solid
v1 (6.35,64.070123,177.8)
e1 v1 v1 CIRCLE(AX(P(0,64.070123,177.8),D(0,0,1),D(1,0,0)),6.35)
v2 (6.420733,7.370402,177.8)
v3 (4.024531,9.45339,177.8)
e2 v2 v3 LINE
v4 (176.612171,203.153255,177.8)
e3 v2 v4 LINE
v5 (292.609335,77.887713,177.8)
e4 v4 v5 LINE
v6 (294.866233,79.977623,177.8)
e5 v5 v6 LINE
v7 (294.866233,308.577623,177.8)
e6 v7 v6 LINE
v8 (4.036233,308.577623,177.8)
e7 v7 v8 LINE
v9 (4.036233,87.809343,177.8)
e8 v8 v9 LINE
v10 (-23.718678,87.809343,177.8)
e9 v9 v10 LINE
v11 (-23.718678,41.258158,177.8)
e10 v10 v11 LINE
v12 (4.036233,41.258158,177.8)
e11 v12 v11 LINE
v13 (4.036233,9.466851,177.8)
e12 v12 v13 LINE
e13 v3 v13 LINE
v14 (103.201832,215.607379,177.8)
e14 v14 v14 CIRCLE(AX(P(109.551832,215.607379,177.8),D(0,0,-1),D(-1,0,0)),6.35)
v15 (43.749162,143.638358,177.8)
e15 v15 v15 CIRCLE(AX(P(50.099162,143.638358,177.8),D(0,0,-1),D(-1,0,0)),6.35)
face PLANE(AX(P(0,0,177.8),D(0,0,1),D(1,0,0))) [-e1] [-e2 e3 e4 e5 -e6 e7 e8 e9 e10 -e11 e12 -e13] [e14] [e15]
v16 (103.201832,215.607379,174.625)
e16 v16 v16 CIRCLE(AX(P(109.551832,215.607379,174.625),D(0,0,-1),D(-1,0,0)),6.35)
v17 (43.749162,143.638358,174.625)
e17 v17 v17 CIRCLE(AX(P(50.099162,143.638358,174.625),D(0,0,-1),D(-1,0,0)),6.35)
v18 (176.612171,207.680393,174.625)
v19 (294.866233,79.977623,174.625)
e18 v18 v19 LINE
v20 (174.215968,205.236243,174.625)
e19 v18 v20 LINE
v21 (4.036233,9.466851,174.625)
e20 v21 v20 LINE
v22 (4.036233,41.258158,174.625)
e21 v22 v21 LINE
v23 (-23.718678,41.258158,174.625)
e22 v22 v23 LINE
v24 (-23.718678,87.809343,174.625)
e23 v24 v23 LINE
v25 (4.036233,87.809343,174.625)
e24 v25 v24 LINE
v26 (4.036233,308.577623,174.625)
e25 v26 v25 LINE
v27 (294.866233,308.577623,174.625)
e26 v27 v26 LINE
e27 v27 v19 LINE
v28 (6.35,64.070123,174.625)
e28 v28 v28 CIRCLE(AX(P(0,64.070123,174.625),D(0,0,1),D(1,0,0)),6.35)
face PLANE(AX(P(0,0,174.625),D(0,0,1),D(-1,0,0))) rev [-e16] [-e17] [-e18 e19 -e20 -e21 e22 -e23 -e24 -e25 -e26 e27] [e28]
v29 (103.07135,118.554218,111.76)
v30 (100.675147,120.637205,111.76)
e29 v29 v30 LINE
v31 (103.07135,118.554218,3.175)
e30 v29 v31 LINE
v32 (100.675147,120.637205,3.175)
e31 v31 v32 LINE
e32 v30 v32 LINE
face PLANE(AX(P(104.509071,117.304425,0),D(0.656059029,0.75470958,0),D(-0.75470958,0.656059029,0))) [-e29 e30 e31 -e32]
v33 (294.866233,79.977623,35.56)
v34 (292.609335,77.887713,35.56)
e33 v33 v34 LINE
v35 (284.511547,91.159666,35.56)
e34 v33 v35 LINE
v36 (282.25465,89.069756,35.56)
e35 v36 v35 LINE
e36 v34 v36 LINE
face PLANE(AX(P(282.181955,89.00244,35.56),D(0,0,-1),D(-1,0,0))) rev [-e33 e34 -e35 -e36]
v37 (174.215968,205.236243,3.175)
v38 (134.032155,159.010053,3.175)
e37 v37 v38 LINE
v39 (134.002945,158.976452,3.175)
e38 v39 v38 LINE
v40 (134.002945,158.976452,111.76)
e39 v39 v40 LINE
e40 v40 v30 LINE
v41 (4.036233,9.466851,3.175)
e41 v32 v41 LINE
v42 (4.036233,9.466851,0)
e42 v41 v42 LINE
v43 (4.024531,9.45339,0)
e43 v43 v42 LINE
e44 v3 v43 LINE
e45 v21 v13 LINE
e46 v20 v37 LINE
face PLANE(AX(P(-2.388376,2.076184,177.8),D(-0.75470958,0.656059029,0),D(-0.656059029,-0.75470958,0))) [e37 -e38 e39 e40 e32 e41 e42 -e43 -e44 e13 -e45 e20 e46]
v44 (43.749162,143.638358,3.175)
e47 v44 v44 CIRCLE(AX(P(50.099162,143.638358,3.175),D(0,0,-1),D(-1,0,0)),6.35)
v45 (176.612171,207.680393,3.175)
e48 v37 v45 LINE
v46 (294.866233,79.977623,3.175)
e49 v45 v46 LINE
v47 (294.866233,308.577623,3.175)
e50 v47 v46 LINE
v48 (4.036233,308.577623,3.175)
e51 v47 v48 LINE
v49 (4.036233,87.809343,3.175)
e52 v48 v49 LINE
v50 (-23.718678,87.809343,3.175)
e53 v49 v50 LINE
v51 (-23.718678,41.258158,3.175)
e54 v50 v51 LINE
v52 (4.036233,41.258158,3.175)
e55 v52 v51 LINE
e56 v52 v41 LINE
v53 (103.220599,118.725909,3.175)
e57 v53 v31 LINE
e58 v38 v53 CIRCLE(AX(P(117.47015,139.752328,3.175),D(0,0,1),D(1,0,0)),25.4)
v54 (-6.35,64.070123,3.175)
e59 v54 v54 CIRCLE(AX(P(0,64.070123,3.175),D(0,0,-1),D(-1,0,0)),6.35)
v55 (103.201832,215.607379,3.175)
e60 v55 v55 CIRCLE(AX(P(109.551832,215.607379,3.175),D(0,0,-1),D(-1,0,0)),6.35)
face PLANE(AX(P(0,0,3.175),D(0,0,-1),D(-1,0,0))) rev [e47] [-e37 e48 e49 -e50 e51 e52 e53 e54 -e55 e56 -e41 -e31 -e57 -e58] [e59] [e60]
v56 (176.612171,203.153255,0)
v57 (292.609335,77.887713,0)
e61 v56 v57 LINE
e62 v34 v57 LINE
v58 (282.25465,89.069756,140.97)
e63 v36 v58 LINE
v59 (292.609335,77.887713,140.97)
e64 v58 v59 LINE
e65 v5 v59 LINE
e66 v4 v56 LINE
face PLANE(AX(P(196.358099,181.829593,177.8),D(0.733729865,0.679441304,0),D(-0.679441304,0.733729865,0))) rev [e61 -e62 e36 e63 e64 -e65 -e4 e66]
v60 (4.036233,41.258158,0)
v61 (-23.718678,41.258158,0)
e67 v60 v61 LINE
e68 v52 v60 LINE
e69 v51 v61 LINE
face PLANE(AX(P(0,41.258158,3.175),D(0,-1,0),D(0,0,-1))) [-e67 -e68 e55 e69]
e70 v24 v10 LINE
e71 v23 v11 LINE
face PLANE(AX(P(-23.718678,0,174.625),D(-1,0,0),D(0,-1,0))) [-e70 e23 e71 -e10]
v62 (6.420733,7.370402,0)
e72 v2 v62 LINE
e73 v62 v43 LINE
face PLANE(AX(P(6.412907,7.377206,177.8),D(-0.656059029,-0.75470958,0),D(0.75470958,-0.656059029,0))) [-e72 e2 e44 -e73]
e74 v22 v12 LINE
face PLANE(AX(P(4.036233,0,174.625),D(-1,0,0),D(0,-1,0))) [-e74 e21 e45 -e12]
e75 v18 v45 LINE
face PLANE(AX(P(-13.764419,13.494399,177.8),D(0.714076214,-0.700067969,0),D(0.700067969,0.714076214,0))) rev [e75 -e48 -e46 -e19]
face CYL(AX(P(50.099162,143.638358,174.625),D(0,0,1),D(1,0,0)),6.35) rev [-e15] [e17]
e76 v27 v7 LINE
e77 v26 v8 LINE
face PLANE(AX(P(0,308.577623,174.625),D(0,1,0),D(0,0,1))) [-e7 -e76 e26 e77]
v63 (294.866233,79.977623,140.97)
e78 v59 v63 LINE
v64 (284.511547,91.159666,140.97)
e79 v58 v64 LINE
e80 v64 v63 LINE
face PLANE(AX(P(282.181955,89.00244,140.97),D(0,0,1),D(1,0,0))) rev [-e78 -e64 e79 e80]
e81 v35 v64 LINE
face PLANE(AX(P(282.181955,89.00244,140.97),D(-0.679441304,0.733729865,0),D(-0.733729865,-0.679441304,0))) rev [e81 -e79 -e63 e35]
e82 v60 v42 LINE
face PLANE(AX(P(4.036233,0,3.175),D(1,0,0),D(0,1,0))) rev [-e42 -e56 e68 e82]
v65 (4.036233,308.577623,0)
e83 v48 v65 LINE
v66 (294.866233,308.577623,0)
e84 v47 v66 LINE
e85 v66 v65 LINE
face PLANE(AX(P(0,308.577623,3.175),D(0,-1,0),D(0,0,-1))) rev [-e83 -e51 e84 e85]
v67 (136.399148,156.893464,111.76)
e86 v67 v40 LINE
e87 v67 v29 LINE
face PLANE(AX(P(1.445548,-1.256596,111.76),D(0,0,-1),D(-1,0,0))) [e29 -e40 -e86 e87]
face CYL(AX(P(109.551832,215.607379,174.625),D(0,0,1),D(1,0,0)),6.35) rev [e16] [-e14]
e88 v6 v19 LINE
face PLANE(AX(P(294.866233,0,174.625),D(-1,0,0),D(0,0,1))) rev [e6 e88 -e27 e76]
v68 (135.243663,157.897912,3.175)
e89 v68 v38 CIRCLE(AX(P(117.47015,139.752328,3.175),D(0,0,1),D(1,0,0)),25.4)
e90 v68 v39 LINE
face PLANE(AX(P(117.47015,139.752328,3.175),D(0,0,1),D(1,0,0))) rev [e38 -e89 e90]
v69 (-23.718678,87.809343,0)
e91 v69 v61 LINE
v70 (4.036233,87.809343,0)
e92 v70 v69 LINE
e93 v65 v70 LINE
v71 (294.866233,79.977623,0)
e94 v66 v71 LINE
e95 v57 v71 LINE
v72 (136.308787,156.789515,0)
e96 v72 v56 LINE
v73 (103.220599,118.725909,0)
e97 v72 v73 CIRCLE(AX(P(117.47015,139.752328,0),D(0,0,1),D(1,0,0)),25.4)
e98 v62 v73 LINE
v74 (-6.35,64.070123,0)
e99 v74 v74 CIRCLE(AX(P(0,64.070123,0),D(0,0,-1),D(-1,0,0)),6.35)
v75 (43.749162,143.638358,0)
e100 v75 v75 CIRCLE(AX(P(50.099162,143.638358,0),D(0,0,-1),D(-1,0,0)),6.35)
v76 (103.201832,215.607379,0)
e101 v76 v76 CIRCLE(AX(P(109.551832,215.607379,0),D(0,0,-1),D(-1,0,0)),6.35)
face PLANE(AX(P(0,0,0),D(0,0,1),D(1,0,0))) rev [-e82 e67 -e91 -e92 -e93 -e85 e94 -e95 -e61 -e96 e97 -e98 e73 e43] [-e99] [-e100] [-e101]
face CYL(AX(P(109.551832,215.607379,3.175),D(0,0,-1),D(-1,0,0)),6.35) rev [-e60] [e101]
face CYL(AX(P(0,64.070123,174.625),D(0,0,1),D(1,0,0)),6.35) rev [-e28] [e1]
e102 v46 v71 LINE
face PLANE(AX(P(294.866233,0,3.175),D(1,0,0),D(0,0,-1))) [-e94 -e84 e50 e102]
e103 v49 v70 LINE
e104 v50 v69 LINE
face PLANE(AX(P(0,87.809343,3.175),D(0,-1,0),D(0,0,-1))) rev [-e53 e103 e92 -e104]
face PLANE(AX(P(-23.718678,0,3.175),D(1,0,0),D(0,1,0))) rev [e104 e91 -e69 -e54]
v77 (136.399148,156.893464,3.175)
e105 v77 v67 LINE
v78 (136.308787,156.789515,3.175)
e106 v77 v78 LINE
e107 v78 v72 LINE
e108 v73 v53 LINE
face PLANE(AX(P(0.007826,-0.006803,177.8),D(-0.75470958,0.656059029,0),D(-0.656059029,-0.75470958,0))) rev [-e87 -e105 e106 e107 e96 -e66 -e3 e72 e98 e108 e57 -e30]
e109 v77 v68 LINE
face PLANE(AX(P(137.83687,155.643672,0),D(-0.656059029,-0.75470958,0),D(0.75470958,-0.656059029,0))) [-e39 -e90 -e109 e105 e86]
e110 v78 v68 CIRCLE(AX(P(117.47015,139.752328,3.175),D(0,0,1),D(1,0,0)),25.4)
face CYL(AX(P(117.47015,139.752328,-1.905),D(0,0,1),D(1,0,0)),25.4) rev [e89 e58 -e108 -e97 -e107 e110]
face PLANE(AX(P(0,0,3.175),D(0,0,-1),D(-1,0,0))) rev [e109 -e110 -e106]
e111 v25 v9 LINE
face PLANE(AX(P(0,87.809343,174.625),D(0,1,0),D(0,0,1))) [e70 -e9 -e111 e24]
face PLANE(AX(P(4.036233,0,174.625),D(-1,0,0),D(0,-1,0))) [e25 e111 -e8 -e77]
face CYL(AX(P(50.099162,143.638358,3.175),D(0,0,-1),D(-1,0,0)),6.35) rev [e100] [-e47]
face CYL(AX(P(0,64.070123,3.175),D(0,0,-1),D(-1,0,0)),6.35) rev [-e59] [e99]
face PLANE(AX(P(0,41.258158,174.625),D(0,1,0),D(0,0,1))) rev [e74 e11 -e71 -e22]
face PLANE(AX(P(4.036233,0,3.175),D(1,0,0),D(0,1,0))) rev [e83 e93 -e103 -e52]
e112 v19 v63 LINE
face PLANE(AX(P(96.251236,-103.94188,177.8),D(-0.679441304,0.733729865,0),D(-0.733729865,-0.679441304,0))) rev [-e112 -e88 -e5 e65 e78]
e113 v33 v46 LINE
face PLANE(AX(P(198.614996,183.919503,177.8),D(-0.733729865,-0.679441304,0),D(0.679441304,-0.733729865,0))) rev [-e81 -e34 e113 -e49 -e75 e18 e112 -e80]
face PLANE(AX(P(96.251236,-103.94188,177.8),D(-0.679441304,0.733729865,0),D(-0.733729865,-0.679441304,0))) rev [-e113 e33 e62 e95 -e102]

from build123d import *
from build123d.topology import SkipClean

# Parameters (mm, degrees)
BOSS_EXTRUDE1_DEPTH    = 177.8
SKETCH2_R              = 6.35
BOSS_EXTRUDE2_DEPTH    = 3.175
CUT_EXTRUDE1_START     = -3.175
CUT_EXTRUDE1_OUTLINE_W = 50.8
CUT_EXTRUDE1_OUTLINE_H = 108.585
CUT_EXTRUDE1_DEPTH     = 3.175
SKETCH4_R              = 25.4
CUT_EXTRUDE2_DEPTH     = 5.08
BOSS_EXTRUDE3_DEPTH    = 3.175
BOSS_EXTRUDE4_START    = -3.175
BOSS_EXTRUDE4_DEPTH    = 3.175
SKETCH2_3_R            = 6.35
CUT_EXTRUDE3_DEPTH     = 203.2
SKETCH7_W              = 105.41
SKETCH7_H              = 15.24
CUT_EXTRUDE4_DEPTH     = 3.175


# Read off the part's stored shape, not the designer's step: Cut-Extrude1
with BuildPart() as part:
    # Sketch1 → Boss-Extrude1 (new body)
    with BuildSketch(Plane.XY):
        Polygon((174.215968213, 205.236242664), (176.61217113, 203.153255247), (6.420733494, 7.37040221), (4.024530577, 9.453389627), align=None)
        Polygon((176.61217113, 203.153255247), (176.61217113, 207.680393207), (174.215968213, 205.236242664), align=None)
        Polygon((176.61217113, 203.153255247), (176.61217113, 207.680393207), (294.86623267, 79.97762329), (292.609334988, 77.887713122), align=None)
    extrude(amount=BOSS_EXTRUDE1_DEPTH)

    # Sketch2 → Boss-Extrude2 (add)
    with BuildSketch(Plane(origin=(0, 0, 0), x_dir=(-1, 0, 0), z_dir=(0, 0, -1))):
        Polygon((-176.61217113, 207.680393207), (-294.86623267, 79.97762329), (-294.86623267, 308.57762329), (-4.03623267, 308.57762329), (-4.03623267, 9.466851346), align=None)
        with Locations((-109.551832016, 215.6073789)):
            Circle(SKETCH2_R, mode=Mode.SUBTRACT)
        with Locations((-50.099162461, 143.63835786)):
            Circle(SKETCH2_R, mode=Mode.SUBTRACT)
    boss_extrude2 = extrude(amount=-BOSS_EXTRUDE2_DEPTH)

    # Mirror1: Boss-Extrude2 across plane
    add(boss_extrude2.mirror(Plane.XY.offset(88.9)))

    # Cut-Extrude1 outline → Cut-Extrude1 (cut)
    with BuildSketch(Plane(origin=(-2.388376456, 2.076183978, 0), x_dir=(0.6560590289905027, 0.754709580222776, 0), z_dir=(-0.754709580222776, 0.6560590289905027, 0)).offset(CUT_EXTRUDE1_START)):
        with Locations((182.49489334, -57.4675)):
            Rectangle(CUT_EXTRUDE1_OUTLINE_W, CUT_EXTRUDE1_OUTLINE_H)
    extrude(amount=CUT_EXTRUDE1_DEPTH, mode=Mode.SUBTRACT)

    # Sketch4 → Cut-Extrude2 (cut)
    with BuildSketch(Plane.XY.offset(3.175)):
        with Locations((117.470149606, 139.752328242)):
            Circle(SKETCH4_R)
    extrude(amount=-CUT_EXTRUDE2_DEPTH, mode=Mode.SUBTRACT)

    # Sketch5 → Boss-Extrude3 (add)
    with BuildSketch(Plane(origin=(0, 0, 0), x_dir=(-1, 0, 0), z_dir=(0, 0, -1))):
        with BuildLine():
            Line((23.718677813, 87.809342908), (-4.03623267, 87.809342908))
            Line((-4.03623267, 87.809342908), (-4.03623267, 68.97229904))
            ThreePointArc((-4.03623267, 68.97229904), (2.710389506, 69.812621892), (6.35, 64.070123417))
            ThreePointArc((6.35, 64.070123417), (2.710389506, 58.327624943), (-4.03623267, 59.167947795))
            Line((-4.03623267, 59.167947795), (-4.03623267, 41.258157594))
            Line((-4.03623267, 41.258157594), (23.718677813, 41.258157594))
            Line((23.718677813, 41.258157594), (23.718677813, 87.809342908))
        make_face()
    extrude(amount=-BOSS_EXTRUDE3_DEPTH)

    # Sketch6 → Boss-Extrude4 (add)
    with BuildSketch(Plane.XY.offset(177.8).offset(BOSS_EXTRUDE4_START)):
        with BuildLine():
            Line((4.03623267, 68.97229904), (4.03623267, 87.809342908))
            Line((4.03623267, 87.809342908), (-23.718677813, 87.809342908))
            Line((-23.718677813, 87.809342908), (-23.718677813, 41.258157594))
            Line((-23.718677813, 41.258157594), (4.03623267, 41.258157594))
            Line((4.03623267, 41.258157594), (4.03623267, 59.167947795))
            ThreePointArc((4.03623267, 59.167947795), (-6.35, 64.070123417), (4.03623267, 68.97229904))
        make_face()
    extrude(amount=BOSS_EXTRUDE4_DEPTH)

    # Sketch2<3> → Cut-Extrude3 (cut)
    with SkipClean():  # the faces are left unmerged after this step: merging them gives an invalid solid
        with BuildSketch(Plane(origin=(0, 0, 0), x_dir=(-1, 0, 0), z_dir=(0, 0, -1))):
            with Locations((0, 64.070123417)):
                Circle(SKETCH2_3_R)
        extrude(amount=-CUT_EXTRUDE3_DEPTH, mode=Mode.SUBTRACT)

    # Sketch7 → Cut-Extrude4 (cut)
    with SkipClean():  # the faces are left unmerged after this step: merging them gives an invalid solid
        with BuildSketch(Plane(origin=(198.614996443, 183.919503291, 0), x_dir=(0, 0, -1), z_dir=(0.7337298645028701, 0.6794413042615234, 0))):
            with Locations((-88.265, -134.042327008)):
                Rectangle(SKETCH7_W, SKETCH7_H)
        extrude(amount=-CUT_EXTRUDE4_DEPTH, mode=Mode.SUBTRACT)


solid = part.part
